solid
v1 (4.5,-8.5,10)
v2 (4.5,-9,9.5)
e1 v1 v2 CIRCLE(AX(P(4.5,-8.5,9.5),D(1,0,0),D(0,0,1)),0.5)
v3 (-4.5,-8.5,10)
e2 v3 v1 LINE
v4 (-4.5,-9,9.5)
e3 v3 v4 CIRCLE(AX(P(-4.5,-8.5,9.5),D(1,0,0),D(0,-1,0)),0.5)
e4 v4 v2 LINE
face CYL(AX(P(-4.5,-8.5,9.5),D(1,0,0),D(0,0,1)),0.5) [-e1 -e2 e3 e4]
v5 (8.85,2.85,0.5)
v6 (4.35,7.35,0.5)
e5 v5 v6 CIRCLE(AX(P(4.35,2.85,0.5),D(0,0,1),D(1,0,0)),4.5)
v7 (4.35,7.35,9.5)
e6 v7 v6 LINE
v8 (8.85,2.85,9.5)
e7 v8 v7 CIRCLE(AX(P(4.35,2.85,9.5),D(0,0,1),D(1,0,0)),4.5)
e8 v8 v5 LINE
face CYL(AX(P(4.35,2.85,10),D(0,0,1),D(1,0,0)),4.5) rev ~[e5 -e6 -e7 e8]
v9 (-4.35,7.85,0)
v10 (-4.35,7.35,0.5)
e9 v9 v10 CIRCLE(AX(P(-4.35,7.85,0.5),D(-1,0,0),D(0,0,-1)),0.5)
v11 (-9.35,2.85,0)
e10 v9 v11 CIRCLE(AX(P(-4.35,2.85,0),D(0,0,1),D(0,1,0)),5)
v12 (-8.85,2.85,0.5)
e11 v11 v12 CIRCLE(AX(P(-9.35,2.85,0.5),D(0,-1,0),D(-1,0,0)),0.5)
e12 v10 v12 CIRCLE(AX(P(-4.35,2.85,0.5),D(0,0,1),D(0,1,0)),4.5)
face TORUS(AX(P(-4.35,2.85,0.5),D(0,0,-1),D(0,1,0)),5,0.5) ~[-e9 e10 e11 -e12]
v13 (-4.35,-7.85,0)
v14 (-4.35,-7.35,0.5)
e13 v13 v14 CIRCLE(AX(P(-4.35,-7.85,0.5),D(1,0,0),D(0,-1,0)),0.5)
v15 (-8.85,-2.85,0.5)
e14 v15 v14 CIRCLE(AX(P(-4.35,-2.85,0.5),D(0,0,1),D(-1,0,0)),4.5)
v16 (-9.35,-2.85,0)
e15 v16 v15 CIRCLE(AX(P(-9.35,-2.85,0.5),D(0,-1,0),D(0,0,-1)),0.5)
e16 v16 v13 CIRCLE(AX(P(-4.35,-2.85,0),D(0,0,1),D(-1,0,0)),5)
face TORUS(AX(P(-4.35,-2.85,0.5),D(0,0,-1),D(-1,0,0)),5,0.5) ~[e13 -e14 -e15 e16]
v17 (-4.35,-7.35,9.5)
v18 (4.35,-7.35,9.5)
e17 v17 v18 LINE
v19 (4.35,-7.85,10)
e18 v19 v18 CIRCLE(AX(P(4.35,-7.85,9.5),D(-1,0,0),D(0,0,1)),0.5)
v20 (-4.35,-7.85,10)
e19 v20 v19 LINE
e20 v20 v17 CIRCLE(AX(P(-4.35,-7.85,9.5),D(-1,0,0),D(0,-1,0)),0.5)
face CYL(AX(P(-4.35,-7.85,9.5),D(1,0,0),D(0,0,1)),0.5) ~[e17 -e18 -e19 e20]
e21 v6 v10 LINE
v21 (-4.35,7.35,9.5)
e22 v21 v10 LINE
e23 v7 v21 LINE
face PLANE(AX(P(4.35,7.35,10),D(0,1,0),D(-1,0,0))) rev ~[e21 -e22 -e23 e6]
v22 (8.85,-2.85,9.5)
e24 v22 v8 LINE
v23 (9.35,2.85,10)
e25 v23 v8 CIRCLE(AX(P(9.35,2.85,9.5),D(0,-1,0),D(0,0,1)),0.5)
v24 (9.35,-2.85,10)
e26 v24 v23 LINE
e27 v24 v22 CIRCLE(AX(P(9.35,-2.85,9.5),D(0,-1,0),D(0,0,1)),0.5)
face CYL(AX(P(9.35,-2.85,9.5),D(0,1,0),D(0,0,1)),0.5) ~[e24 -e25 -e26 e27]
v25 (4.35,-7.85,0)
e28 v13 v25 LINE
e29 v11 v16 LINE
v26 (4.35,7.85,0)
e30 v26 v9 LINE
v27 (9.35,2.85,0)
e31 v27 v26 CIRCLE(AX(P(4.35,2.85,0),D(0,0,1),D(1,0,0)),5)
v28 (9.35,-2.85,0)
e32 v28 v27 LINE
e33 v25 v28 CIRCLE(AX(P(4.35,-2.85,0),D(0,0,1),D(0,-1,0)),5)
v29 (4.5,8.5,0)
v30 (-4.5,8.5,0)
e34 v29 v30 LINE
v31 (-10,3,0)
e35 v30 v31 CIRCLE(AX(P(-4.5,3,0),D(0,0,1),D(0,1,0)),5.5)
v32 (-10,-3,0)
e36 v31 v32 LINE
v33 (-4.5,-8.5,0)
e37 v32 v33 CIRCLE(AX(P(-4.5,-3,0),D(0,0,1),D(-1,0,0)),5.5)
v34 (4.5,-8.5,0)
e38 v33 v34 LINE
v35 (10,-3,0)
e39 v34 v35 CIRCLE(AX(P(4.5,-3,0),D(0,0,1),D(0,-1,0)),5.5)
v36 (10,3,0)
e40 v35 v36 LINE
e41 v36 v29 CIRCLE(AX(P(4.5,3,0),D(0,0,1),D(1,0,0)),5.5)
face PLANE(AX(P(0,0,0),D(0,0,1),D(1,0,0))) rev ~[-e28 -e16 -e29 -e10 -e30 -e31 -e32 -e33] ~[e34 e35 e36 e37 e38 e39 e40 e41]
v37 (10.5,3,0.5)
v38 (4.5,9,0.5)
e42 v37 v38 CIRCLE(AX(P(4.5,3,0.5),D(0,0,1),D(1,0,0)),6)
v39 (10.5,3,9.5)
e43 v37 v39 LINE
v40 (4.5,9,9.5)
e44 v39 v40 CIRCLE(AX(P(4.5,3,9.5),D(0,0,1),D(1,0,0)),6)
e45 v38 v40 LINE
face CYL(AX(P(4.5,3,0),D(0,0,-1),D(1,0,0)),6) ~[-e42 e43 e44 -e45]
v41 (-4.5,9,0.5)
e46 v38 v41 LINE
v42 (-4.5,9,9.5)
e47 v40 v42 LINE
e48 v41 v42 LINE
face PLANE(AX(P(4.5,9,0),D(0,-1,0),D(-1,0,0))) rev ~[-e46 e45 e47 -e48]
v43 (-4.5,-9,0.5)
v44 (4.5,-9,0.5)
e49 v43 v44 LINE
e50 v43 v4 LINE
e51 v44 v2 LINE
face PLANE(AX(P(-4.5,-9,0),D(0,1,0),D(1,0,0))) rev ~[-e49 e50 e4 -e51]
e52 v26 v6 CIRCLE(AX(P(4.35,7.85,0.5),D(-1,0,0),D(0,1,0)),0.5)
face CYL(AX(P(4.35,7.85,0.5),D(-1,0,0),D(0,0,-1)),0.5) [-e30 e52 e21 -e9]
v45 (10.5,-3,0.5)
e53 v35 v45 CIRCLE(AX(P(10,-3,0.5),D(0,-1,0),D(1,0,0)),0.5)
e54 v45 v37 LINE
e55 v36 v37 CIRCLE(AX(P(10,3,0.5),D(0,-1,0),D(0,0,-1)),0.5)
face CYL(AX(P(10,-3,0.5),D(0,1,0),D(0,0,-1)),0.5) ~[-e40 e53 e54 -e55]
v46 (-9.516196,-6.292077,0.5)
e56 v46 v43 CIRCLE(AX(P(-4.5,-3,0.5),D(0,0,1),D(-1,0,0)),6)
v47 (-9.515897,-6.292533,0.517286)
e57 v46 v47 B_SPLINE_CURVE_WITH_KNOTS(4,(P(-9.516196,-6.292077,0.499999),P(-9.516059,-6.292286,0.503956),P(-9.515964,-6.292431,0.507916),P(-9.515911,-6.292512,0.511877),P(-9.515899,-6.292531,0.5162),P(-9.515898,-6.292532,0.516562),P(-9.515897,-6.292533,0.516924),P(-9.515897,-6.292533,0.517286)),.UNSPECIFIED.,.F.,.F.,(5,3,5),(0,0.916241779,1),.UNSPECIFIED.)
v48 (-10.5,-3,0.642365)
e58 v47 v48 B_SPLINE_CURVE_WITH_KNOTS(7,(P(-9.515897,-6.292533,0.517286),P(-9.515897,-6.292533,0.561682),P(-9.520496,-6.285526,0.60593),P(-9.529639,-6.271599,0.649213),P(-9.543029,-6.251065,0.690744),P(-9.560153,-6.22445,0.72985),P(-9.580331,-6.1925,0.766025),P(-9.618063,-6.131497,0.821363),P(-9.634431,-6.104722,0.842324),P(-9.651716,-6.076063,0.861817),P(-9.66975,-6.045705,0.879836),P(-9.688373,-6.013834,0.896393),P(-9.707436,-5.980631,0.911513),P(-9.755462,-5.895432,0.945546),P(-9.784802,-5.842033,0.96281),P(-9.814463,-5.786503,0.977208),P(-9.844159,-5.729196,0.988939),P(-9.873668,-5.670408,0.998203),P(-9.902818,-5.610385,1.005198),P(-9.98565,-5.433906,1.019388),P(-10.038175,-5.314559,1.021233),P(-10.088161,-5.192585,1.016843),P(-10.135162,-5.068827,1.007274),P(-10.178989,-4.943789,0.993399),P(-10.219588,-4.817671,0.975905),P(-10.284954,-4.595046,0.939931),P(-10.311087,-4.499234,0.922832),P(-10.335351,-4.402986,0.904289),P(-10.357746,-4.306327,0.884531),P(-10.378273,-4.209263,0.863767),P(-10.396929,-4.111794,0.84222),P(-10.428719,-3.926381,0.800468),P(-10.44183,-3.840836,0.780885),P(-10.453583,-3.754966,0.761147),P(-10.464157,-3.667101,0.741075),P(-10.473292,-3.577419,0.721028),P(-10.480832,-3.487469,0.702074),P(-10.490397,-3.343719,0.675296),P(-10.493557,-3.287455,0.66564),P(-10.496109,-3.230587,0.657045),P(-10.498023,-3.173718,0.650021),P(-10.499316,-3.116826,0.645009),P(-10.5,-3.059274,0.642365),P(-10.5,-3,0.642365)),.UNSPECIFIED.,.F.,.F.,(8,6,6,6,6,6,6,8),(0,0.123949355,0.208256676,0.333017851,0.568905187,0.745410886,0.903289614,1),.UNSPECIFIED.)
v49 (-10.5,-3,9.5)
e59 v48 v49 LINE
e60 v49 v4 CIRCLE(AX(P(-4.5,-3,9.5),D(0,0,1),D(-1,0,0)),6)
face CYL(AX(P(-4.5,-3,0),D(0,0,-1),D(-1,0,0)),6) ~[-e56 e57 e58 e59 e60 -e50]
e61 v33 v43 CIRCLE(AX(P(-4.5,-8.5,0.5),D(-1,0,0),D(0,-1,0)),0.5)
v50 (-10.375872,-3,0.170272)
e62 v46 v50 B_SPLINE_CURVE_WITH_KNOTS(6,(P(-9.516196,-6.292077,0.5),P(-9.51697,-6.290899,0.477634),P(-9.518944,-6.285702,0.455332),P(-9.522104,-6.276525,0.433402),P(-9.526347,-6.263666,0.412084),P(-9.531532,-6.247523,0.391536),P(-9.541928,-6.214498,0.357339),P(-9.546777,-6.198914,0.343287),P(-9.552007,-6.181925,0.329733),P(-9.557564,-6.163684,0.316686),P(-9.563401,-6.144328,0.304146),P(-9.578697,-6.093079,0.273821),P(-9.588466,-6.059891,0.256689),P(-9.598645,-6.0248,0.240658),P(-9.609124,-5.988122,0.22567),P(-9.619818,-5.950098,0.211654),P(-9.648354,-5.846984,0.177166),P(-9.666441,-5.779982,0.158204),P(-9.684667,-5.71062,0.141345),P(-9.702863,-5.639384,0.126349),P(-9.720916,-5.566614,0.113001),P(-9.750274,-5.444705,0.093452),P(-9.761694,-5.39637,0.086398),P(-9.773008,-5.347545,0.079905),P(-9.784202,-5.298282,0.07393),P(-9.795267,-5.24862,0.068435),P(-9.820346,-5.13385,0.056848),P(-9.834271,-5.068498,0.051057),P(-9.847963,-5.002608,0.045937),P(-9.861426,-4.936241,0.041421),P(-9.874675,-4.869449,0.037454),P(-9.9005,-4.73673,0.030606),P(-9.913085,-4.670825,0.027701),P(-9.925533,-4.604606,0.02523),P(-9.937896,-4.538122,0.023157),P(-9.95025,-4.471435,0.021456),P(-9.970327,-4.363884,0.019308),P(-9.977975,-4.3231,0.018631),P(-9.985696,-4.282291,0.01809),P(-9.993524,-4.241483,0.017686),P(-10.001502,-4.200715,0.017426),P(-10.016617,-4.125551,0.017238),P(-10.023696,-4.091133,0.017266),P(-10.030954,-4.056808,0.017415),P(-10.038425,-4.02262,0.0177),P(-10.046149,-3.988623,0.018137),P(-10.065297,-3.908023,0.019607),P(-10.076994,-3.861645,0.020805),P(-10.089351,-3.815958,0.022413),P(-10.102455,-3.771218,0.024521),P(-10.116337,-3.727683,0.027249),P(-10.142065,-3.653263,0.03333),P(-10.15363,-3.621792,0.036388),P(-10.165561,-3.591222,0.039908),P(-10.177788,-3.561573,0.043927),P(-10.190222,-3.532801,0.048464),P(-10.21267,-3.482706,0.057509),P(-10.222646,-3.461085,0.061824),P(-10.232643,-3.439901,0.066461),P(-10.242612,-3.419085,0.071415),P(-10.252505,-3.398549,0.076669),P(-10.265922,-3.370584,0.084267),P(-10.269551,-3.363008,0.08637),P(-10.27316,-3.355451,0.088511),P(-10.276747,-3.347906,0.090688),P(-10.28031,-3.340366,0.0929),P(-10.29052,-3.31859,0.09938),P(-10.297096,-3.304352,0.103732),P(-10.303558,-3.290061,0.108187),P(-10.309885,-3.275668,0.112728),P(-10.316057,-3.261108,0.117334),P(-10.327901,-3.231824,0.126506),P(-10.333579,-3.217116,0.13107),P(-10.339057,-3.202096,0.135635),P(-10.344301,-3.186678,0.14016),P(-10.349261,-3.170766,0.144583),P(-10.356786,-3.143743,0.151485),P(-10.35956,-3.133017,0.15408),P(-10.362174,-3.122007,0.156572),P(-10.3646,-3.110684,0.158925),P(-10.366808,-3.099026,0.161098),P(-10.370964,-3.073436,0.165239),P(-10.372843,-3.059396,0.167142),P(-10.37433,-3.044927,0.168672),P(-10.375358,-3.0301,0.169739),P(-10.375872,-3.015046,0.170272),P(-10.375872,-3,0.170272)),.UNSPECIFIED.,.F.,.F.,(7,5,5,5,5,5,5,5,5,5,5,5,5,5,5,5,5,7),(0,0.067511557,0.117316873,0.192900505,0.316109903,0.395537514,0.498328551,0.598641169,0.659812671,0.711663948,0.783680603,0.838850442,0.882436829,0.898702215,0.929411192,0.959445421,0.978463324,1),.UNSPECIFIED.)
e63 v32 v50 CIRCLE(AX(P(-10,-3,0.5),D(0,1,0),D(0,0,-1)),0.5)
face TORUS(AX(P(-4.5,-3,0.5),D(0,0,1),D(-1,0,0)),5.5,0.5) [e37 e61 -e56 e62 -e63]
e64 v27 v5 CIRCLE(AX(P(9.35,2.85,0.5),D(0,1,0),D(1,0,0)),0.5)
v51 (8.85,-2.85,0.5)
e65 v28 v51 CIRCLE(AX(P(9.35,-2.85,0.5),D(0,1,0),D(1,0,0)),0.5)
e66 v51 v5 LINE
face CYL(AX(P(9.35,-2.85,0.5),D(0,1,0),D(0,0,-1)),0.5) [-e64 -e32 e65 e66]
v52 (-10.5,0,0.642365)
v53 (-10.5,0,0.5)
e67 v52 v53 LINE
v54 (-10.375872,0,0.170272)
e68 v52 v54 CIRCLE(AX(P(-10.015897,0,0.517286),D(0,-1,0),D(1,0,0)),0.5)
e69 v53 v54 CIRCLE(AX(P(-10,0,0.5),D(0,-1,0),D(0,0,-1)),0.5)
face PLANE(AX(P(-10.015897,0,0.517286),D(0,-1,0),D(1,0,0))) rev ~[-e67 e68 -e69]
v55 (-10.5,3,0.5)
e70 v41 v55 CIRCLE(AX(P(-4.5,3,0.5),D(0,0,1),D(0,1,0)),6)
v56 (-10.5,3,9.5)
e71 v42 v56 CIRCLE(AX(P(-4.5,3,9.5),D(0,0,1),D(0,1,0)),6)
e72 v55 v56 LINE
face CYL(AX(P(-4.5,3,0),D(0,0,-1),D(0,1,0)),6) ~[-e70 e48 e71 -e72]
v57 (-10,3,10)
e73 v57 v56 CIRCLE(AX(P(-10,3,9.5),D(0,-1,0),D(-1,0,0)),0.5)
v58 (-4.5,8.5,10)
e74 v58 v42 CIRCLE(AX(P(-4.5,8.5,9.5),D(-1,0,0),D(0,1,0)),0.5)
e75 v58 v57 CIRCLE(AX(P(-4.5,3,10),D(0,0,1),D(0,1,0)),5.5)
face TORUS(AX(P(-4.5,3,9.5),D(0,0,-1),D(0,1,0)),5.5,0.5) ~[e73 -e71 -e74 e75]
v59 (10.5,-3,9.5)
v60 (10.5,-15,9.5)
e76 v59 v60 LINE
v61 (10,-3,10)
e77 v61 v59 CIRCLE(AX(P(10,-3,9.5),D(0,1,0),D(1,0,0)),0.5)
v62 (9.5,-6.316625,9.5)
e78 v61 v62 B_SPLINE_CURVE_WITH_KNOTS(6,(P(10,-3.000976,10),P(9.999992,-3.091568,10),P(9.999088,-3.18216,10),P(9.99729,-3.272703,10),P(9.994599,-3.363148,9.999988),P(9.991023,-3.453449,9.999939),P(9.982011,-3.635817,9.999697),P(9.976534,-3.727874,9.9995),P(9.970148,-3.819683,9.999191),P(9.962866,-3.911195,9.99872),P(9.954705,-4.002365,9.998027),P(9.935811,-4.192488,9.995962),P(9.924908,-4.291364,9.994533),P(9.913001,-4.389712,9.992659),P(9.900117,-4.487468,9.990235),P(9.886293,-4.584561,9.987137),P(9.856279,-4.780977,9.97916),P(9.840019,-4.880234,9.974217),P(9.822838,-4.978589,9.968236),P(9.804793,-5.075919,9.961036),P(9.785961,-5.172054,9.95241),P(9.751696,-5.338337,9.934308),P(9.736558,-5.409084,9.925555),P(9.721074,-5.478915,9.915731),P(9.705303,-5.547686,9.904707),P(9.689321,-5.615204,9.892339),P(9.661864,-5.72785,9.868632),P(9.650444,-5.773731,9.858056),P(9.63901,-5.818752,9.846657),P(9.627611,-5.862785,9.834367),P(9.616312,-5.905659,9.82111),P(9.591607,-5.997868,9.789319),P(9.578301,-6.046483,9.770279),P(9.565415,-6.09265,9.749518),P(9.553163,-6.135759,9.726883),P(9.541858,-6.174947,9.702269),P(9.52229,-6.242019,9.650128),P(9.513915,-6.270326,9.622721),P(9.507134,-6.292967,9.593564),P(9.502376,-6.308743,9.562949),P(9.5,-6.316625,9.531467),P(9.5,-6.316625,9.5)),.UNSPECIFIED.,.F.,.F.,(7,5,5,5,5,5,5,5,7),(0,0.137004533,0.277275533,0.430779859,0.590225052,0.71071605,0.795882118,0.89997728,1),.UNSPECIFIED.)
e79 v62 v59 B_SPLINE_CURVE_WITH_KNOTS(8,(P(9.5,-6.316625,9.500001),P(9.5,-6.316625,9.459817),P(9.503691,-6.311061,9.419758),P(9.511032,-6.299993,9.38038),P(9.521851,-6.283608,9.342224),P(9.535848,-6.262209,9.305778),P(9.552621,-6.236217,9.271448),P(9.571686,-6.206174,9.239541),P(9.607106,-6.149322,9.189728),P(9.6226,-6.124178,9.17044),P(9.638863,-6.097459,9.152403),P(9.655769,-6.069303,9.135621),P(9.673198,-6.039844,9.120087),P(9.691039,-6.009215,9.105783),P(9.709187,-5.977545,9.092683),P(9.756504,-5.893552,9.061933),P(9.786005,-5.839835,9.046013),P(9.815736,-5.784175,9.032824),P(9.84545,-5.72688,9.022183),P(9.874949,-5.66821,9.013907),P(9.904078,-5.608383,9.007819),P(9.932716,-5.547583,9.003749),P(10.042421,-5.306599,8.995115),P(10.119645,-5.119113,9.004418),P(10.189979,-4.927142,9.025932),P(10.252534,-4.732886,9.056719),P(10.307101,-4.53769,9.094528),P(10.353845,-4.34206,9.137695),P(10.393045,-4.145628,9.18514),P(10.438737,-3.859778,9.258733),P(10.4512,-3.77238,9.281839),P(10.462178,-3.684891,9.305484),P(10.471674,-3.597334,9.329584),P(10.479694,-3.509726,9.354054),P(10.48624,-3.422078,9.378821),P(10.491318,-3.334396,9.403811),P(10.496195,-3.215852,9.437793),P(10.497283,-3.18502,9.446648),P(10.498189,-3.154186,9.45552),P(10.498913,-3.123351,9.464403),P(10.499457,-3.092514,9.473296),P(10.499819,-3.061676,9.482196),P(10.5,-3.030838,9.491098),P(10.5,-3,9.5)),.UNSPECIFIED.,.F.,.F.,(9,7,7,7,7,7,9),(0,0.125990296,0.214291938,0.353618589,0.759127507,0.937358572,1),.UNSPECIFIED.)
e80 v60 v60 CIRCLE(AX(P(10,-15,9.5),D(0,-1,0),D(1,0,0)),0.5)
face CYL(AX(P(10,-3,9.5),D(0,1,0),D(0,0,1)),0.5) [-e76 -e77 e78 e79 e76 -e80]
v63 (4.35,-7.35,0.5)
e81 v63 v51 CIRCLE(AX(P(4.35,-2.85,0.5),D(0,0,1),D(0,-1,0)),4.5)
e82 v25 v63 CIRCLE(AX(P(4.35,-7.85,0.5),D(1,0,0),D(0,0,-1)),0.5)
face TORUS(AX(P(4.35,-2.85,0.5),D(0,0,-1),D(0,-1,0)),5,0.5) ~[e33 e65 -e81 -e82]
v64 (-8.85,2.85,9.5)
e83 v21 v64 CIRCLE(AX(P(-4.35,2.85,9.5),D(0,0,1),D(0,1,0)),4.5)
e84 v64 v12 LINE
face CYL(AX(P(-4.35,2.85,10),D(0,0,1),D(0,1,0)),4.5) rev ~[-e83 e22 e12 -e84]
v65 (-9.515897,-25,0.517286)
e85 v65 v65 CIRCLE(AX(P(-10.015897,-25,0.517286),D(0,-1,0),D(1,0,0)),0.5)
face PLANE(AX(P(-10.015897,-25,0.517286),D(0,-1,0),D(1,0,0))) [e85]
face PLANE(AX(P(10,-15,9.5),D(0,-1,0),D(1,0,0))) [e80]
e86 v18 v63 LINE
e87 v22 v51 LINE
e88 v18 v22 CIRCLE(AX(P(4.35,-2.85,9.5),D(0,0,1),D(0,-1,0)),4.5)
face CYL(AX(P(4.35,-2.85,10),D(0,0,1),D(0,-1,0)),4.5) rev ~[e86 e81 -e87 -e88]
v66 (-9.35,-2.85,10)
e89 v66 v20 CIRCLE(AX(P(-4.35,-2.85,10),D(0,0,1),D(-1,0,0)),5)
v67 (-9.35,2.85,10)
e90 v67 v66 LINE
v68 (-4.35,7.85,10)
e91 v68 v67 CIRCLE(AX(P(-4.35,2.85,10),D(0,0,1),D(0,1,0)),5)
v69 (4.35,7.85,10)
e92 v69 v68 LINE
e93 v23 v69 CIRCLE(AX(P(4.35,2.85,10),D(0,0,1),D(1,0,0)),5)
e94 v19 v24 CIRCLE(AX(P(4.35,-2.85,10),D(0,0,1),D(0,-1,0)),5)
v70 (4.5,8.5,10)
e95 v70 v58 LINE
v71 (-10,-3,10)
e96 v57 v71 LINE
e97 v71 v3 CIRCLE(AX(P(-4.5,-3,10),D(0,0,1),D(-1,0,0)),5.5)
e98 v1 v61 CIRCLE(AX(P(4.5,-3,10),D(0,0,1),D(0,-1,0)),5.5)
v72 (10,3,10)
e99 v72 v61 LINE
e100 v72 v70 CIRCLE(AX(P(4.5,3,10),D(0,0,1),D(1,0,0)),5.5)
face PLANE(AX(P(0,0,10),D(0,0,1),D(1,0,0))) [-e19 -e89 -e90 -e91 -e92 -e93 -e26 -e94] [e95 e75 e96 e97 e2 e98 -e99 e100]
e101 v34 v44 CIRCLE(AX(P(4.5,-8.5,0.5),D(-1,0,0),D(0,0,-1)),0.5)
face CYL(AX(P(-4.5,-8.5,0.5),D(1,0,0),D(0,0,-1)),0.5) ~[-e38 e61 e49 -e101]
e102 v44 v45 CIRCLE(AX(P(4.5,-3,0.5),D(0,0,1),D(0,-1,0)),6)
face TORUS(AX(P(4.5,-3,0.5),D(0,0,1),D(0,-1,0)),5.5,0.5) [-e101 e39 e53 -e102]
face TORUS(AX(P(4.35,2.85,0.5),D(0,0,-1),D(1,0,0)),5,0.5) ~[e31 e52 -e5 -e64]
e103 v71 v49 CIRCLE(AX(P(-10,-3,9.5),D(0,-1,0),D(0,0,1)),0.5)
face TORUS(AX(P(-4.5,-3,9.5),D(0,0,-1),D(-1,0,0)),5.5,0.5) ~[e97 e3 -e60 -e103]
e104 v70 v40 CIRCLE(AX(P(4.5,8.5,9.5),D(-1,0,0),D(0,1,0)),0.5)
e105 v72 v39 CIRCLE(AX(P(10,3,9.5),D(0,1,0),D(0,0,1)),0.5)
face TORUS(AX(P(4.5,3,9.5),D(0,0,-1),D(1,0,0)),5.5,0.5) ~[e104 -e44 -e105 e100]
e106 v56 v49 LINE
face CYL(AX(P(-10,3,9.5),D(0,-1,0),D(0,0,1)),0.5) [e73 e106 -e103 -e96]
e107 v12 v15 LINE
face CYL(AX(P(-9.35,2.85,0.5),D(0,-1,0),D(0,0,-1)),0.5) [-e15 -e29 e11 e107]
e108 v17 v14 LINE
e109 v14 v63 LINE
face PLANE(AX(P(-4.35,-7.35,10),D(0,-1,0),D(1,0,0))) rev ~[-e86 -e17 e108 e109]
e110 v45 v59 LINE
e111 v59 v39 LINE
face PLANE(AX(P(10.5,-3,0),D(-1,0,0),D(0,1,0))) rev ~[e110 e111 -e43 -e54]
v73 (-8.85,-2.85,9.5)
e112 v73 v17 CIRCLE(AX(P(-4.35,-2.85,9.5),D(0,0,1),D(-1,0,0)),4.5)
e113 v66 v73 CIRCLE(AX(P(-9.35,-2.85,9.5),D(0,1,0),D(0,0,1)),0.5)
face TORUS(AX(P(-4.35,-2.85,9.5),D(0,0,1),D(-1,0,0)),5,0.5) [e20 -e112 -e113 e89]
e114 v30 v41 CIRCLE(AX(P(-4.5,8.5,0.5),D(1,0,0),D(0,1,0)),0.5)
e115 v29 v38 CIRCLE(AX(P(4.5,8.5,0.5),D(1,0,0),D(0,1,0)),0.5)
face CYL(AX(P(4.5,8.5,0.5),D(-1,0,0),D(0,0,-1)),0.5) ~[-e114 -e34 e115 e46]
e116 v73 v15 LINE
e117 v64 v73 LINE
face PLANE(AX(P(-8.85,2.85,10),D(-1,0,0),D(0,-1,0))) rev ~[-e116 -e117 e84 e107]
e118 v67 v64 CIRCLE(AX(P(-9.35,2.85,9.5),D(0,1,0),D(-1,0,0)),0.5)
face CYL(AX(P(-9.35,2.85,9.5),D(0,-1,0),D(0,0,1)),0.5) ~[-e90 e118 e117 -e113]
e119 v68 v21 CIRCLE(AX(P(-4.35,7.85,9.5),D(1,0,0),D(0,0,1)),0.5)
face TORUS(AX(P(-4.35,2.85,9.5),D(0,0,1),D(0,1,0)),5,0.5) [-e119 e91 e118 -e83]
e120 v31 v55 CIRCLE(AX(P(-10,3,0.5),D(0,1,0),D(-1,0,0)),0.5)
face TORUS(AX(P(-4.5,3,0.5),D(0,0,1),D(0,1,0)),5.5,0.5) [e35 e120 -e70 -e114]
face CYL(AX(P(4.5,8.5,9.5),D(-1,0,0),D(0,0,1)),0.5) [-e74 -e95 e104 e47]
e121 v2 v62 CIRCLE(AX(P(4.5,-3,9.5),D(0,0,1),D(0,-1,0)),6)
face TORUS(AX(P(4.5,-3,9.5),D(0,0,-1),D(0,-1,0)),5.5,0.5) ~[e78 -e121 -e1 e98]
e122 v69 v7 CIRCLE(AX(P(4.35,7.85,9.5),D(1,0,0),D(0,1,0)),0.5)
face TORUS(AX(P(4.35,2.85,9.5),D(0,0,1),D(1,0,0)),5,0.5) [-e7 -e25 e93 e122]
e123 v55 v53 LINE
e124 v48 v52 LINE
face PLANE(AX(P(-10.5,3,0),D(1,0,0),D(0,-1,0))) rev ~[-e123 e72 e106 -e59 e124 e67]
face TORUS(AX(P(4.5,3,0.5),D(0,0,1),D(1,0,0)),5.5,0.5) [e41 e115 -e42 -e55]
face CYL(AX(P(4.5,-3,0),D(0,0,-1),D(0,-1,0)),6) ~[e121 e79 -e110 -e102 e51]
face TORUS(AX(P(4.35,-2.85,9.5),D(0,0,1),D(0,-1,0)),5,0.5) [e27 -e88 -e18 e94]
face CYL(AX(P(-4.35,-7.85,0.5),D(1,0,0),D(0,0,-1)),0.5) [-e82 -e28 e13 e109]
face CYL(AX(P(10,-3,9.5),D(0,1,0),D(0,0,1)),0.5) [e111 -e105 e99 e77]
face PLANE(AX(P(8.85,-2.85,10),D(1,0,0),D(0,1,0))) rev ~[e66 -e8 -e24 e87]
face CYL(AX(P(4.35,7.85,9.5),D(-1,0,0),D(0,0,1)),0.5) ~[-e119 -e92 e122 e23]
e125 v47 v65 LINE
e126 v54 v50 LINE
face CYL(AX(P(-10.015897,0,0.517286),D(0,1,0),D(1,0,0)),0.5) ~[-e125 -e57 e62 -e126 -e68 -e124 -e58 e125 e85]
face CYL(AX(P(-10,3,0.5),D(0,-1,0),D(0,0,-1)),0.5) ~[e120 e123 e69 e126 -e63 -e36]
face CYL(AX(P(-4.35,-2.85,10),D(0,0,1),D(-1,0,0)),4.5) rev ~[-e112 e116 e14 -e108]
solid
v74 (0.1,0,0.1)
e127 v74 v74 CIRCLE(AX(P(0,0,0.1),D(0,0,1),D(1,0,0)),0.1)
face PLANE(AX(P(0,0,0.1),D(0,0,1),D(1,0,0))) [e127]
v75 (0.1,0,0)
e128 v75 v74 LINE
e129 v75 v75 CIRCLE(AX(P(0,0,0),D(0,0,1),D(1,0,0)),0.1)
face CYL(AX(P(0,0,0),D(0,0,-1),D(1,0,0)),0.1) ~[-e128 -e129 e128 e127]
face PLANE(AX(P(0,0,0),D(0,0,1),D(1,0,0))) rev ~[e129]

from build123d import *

# Parameters (mm, degrees)
F1_DEPTH  = 10
F3_DEPTH  = 10
F4_R      = 0.5
F5_R      = 0.1
F6_DEPTH  = 0.1
F7_R      = 0.5
F8_DEPTH  = 25
F9_R      = 0.5
F10_DEPTH = 15


# Not quite as in the source:
# - after a boolean that leaves OpenCascade's solid faulty, fix() repairs it


with BuildPart() as f1:
    # F0 (on Top) → F1 (new body)
    with BuildSketch(Plane.XY):
        with BuildLine():
            Line((-4.5, -9), (4.5, -9))
            ThreePointArc((4.5, -9), (8.7426406871, -7.2426406871), (10.5, -3))
            Line((10.5, -3), (10.5, 3))
            ThreePointArc((10.5, 3), (8.7426406871, 7.2426406871), (4.5, 9))
            Line((4.5, 9), (-4.5, 9))
            ThreePointArc((-4.5, 9), (-8.7426406871, 7.2426406871), (-10.5, 3))
            Line((-10.5, 3), (-10.5, -3))
            ThreePointArc((-10.5, -3), (-8.7426406871, -7.2426406871), (-4.5, -9))
        make_face()
    extrude(amount=F1_DEPTH)

    # F2 (on face) → F3 (cut)
    with BuildSketch(Plane.XY.offset(10)):
        with BuildLine():
            Line((-4.35, -7.35), (4.35, -7.35))
            ThreePointArc((4.35, -7.35), (7.5319805153, -6.0319805153), (8.85, -2.85))
            Line((8.85, -2.85), (8.85, 2.85))
            ThreePointArc((8.85, 2.85), (7.5319805153, 6.0319805153), (4.35, 7.35))
            Line((4.35, 7.35), (-4.35, 7.35))
            ThreePointArc((-4.35, 7.35), (-7.5319805153, 6.0319805153), (-8.85, 2.85))
            Line((-8.85, 2.85), (-8.85, -2.85))
            ThreePointArc((-8.85, -2.85), (-7.5319805153, -6.0319805153), (-4.35, -7.35))
        make_face()
    extrude(amount=-F3_DEPTH, mode=Mode.SUBTRACT)

    # F4
    f4_edges = [f1.edges().sort_by_distance(p)[0] for p in [
        (-8.742641, 7.242641, 10),
        (8.85, 0, 10),
        (-8.742641, 7.242641, 0),
        (7.531981, 6.031981, 0),
    ]]
    fillet(f4_edges, radius=F4_R)

    # F7 (on Front) → F8 (join)
    with BuildSketch(Plane.XZ):
        with Locations((-10.0158974528, 0.5172858946)):
            Circle(F7_R)
    extrude(amount=F8_DEPTH)

    # F9 (on Front) → F10 (join)
    with BuildSketch(Plane.XZ):
        with Locations((10, 9.5)):
            Circle(F9_R)
    extrude(amount=F10_DEPTH)

    add(f1.part.fix(), mode=Mode.REPLACE)


with BuildPart() as f6:
    # F5 (on Top) → F6 (new body)
    with BuildSketch(Plane.XY):
        Circle(F5_R)
    extrude(amount=F6_DEPTH)


solid = Compound([f1.part, f6.part])
